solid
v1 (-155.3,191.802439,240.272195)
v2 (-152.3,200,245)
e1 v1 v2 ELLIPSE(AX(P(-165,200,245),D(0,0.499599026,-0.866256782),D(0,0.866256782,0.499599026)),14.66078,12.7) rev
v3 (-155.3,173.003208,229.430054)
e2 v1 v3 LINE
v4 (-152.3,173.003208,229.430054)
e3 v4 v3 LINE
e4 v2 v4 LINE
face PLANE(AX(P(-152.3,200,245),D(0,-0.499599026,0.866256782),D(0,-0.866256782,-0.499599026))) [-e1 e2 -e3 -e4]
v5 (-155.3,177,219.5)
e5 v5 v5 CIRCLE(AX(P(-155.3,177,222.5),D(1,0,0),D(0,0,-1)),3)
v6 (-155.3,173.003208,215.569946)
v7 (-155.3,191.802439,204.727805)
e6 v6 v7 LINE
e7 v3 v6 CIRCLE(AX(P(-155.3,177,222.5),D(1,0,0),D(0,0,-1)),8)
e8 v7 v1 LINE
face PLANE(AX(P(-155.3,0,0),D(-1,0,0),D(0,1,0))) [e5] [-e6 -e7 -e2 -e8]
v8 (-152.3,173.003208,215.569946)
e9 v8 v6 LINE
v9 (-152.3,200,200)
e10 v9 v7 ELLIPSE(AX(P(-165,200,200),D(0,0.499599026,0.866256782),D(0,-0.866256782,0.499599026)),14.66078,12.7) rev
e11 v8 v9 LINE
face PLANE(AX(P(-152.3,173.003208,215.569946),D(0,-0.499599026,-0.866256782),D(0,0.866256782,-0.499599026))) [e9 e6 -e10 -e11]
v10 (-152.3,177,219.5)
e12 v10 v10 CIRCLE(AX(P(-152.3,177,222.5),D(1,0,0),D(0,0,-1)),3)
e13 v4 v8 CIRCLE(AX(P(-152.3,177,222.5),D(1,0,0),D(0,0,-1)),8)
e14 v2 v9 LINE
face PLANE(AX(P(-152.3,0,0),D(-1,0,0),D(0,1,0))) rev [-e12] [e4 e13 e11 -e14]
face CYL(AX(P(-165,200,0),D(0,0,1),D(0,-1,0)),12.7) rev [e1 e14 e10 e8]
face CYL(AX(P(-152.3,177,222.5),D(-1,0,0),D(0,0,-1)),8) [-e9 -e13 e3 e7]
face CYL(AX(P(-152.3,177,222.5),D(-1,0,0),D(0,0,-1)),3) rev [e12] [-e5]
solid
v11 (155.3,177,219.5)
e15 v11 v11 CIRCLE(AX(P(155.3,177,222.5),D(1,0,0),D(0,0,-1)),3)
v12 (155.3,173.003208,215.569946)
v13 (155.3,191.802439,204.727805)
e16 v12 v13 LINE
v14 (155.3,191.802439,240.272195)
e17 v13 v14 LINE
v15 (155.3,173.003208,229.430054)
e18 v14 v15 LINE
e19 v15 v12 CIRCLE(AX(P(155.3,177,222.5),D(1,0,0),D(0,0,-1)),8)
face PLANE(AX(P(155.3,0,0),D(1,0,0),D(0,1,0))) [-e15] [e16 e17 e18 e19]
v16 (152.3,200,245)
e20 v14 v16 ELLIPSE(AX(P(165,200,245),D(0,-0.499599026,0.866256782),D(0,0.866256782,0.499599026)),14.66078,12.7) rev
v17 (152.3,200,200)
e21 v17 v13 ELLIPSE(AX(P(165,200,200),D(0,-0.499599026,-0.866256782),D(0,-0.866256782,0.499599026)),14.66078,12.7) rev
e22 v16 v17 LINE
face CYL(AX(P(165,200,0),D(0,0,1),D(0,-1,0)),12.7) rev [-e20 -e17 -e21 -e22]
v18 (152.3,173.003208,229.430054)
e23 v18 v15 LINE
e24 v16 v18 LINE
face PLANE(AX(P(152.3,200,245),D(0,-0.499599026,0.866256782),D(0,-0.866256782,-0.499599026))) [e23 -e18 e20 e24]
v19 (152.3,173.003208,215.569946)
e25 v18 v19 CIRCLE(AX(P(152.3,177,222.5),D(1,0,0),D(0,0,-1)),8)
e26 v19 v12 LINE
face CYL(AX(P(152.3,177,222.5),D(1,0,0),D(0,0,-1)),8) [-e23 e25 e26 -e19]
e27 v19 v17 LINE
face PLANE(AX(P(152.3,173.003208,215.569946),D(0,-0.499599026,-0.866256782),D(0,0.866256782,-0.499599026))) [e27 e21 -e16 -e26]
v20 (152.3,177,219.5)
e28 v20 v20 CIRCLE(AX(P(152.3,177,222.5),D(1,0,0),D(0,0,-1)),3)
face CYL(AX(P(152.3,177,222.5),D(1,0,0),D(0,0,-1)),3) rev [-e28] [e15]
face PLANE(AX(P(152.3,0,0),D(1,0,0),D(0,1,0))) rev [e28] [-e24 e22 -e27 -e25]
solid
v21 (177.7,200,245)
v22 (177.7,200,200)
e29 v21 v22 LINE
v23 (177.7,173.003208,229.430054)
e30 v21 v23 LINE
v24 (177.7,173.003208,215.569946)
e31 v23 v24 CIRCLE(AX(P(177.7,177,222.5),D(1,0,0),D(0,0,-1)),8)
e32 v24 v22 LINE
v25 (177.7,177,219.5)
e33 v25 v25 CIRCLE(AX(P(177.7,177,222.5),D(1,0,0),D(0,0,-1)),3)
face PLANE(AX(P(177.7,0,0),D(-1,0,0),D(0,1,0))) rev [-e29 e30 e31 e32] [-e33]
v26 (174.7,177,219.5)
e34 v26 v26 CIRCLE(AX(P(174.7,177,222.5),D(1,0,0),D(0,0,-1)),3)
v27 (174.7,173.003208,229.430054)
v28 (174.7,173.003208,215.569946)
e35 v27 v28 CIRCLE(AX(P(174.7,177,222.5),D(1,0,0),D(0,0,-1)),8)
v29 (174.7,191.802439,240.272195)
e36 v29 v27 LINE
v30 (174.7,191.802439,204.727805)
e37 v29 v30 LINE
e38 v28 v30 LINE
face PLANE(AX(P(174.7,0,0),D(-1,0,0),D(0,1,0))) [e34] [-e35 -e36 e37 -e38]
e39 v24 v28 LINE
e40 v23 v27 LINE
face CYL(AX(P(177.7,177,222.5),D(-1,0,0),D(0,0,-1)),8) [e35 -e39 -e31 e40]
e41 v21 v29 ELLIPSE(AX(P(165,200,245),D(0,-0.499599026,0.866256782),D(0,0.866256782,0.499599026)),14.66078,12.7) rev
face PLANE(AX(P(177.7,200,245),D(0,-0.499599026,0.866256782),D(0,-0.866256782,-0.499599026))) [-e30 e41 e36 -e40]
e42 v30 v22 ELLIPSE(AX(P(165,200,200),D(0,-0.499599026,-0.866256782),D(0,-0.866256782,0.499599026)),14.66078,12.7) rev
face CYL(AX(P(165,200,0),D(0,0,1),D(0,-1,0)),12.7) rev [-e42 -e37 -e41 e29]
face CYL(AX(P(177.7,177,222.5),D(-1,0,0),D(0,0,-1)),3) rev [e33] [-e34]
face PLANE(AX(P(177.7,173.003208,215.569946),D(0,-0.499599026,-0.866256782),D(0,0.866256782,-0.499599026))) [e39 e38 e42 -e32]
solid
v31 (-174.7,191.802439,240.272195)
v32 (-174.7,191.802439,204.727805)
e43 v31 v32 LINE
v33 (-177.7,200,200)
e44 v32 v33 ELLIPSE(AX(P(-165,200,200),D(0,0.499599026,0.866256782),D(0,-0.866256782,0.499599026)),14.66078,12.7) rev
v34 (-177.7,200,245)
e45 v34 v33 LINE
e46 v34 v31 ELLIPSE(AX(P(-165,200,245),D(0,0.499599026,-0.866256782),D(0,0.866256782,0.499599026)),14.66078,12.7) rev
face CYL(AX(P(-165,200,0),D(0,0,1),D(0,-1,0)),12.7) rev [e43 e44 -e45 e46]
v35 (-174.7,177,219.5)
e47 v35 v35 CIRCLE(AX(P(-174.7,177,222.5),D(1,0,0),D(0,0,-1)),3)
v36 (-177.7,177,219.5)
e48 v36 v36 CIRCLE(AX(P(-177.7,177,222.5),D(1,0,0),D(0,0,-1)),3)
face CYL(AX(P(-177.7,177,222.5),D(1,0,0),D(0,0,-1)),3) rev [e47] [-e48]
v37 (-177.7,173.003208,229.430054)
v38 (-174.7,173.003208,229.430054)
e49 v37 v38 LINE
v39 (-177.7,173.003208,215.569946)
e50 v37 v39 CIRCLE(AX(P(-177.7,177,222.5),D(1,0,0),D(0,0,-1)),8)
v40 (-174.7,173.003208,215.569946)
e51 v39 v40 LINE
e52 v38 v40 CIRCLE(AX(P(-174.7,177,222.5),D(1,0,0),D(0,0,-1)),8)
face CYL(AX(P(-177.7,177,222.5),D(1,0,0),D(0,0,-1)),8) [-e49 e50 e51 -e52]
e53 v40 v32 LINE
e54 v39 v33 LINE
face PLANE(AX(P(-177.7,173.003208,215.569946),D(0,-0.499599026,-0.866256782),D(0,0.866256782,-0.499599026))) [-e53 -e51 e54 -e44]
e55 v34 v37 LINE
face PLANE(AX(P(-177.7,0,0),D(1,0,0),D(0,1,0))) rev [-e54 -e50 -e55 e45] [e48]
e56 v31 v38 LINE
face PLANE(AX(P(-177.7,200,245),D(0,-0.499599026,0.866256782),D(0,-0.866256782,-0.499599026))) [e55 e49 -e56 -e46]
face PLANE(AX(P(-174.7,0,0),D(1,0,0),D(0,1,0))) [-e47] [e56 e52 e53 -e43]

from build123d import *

# Parameters (mm, degrees)
F_3DSKETCH1_R       = 3
BOSS_EXTRUDE1_DEPTH = 3
INDENT1_START       = 199
INDENT1_DEPTH       = 47
INDENT1_START_2     = 200
INDENT1_2_DEPTH     = 45
INDENT1_START_3     = 174
INDENT1_3_DEPTH     = 3
INDENT2_START       = 199
INDENT2_DEPTH       = 47
INDENT2_START_2     = 200
INDENT2_2_DEPTH     = 45
INDENT2_START_3     = 153
INDENT2_3_DEPTH     = 3


with BuildPart() as part:
    # 3DSketch1 → Boss-Extrude1 (new body)
    with BuildSketch(Plane(origin=(152.3, 200, 245), x_dir=(0, 0, -1), z_dir=(-1, 0, 0))):
        with BuildLine():
            Line((0, 0), (45, 0))
            Line((45, 0), (29.430054259, 26.99679221))
            ThreePointArc((29.430054259, 26.99679221), (22.5, 31), (15.569945741, 26.99679221))
            Line((15.569945741, 26.99679221), (0, 0))
        make_face()
        with Locations((22.5, 23)):
            Circle(F_3DSKETCH1_R, mode=Mode.SUBTRACT)
    extrude(amount=-BOSS_EXTRUDE1_DEPTH)


with BuildPart() as body_2:
    # Mirror1: mirrored copy
    add(part.part.mirror(Plane(origin=(165, 0, 0), x_dir=(0, 0, 1), z_dir=(1, 0, 0))))

    # Indent1: read off the stored shape, not the designer's step
    # Indent1 outline → Indent1 (cut)
    with BuildSketch(Plane.XY.offset(INDENT1_START)):
        with BuildLine():
            Line((174.7, 200), (174.7, 191.802439387))
            ThreePointArc((174.7, 191.802439387), (176.926441213, 195.635369431), (177.7, 200))
            Line((177.7, 200), (174.7, 200))
        make_face()
    extrude(amount=INDENT1_DEPTH, mode=Mode.SUBTRACT)


with BuildPart() as body_3:
    # Indent1 2 outline → Indent1 2 (new body)
    with BuildSketch(Plane.XY.offset(INDENT1_START_2)):
        with BuildLine():
            Line((176.4, 200), (174.7, 200))
            Line((174.7, 200), (174.7, 194.010843131))
            ThreePointArc((174.7, 194.010843131), (175.966767983, 196.887123517), (176.4, 200))
        make_face()
    extrude(amount=INDENT1_2_DEPTH)

    # Indent1 3 outline → Indent1 3 (cut)
    with BuildSketch(Plane.YZ.offset(INDENT1_START_3)):
        Polygon((200, 200), (194.010843131, 203.454145469), (193, 204.037132239), (193, 200), align=None)
        Polygon((193, 245), (193, 240.962867761), (194.010843131, 241.545854531), (200, 245), align=None)
    extrude(amount=INDENT1_3_DEPTH, mode=Mode.SUBTRACT)


with BuildPart() as part_1:
    add(part.part)

    # Indent2: read off the stored shape, not the designer's step
    # Indent2 outline → Indent2 (cut)
    with BuildSketch(Plane.XY.offset(INDENT2_START)):
        with BuildLine():
            Line((155.3, 200), (152.3, 200))
            ThreePointArc((152.3, 200), (153.073558787, 195.635369431), (155.3, 191.802439387))
            Line((155.3, 191.802439387), (155.3, 200))
        make_face()
    extrude(amount=INDENT2_DEPTH, mode=Mode.SUBTRACT)


with BuildPart() as body_4:
    # Indent2 2 outline → Indent2 2 (new body)
    with BuildSketch(Plane.XY.offset(INDENT2_START_2)):
        with BuildLine():
            Line((155.3, 200), (153.6, 200))
            ThreePointArc((153.6, 200), (154.033232017, 196.887123517), (155.3, 194.010843131))
            Line((155.3, 194.010843131), (155.3, 200))
        make_face()
    extrude(amount=INDENT2_2_DEPTH)

    # Indent2 3 outline → Indent2 3 (cut)
    with BuildSketch(Plane.YZ.offset(INDENT2_START_3)):
        Polygon((194.010843131, 241.545854531), (200, 245), (193, 245), (193, 240.962867761), align=None)
        Polygon((194.010843131, 203.454145469), (193, 204.037132239), (193, 200), (200, 200), align=None)
    extrude(amount=INDENT2_3_DEPTH, mode=Mode.SUBTRACT)


with BuildPart() as body_3_2:
    # Mirror2: mirrored copy
    add(body_2.part.mirror(Plane(origin=(0, 0, 0), x_dir=(0, 0, 1), z_dir=(1, 0, 0))))


with BuildPart() as body_4_2:
    # Mirror2 2: mirrored copy
    add(part_1.part.mirror(Plane(origin=(0, 0, 0), x_dir=(0, 0, 1), z_dir=(1, 0, 0))))


solid = Compound([body_2.part, part_1.part, body_3_2.part, body_4_2.part])
